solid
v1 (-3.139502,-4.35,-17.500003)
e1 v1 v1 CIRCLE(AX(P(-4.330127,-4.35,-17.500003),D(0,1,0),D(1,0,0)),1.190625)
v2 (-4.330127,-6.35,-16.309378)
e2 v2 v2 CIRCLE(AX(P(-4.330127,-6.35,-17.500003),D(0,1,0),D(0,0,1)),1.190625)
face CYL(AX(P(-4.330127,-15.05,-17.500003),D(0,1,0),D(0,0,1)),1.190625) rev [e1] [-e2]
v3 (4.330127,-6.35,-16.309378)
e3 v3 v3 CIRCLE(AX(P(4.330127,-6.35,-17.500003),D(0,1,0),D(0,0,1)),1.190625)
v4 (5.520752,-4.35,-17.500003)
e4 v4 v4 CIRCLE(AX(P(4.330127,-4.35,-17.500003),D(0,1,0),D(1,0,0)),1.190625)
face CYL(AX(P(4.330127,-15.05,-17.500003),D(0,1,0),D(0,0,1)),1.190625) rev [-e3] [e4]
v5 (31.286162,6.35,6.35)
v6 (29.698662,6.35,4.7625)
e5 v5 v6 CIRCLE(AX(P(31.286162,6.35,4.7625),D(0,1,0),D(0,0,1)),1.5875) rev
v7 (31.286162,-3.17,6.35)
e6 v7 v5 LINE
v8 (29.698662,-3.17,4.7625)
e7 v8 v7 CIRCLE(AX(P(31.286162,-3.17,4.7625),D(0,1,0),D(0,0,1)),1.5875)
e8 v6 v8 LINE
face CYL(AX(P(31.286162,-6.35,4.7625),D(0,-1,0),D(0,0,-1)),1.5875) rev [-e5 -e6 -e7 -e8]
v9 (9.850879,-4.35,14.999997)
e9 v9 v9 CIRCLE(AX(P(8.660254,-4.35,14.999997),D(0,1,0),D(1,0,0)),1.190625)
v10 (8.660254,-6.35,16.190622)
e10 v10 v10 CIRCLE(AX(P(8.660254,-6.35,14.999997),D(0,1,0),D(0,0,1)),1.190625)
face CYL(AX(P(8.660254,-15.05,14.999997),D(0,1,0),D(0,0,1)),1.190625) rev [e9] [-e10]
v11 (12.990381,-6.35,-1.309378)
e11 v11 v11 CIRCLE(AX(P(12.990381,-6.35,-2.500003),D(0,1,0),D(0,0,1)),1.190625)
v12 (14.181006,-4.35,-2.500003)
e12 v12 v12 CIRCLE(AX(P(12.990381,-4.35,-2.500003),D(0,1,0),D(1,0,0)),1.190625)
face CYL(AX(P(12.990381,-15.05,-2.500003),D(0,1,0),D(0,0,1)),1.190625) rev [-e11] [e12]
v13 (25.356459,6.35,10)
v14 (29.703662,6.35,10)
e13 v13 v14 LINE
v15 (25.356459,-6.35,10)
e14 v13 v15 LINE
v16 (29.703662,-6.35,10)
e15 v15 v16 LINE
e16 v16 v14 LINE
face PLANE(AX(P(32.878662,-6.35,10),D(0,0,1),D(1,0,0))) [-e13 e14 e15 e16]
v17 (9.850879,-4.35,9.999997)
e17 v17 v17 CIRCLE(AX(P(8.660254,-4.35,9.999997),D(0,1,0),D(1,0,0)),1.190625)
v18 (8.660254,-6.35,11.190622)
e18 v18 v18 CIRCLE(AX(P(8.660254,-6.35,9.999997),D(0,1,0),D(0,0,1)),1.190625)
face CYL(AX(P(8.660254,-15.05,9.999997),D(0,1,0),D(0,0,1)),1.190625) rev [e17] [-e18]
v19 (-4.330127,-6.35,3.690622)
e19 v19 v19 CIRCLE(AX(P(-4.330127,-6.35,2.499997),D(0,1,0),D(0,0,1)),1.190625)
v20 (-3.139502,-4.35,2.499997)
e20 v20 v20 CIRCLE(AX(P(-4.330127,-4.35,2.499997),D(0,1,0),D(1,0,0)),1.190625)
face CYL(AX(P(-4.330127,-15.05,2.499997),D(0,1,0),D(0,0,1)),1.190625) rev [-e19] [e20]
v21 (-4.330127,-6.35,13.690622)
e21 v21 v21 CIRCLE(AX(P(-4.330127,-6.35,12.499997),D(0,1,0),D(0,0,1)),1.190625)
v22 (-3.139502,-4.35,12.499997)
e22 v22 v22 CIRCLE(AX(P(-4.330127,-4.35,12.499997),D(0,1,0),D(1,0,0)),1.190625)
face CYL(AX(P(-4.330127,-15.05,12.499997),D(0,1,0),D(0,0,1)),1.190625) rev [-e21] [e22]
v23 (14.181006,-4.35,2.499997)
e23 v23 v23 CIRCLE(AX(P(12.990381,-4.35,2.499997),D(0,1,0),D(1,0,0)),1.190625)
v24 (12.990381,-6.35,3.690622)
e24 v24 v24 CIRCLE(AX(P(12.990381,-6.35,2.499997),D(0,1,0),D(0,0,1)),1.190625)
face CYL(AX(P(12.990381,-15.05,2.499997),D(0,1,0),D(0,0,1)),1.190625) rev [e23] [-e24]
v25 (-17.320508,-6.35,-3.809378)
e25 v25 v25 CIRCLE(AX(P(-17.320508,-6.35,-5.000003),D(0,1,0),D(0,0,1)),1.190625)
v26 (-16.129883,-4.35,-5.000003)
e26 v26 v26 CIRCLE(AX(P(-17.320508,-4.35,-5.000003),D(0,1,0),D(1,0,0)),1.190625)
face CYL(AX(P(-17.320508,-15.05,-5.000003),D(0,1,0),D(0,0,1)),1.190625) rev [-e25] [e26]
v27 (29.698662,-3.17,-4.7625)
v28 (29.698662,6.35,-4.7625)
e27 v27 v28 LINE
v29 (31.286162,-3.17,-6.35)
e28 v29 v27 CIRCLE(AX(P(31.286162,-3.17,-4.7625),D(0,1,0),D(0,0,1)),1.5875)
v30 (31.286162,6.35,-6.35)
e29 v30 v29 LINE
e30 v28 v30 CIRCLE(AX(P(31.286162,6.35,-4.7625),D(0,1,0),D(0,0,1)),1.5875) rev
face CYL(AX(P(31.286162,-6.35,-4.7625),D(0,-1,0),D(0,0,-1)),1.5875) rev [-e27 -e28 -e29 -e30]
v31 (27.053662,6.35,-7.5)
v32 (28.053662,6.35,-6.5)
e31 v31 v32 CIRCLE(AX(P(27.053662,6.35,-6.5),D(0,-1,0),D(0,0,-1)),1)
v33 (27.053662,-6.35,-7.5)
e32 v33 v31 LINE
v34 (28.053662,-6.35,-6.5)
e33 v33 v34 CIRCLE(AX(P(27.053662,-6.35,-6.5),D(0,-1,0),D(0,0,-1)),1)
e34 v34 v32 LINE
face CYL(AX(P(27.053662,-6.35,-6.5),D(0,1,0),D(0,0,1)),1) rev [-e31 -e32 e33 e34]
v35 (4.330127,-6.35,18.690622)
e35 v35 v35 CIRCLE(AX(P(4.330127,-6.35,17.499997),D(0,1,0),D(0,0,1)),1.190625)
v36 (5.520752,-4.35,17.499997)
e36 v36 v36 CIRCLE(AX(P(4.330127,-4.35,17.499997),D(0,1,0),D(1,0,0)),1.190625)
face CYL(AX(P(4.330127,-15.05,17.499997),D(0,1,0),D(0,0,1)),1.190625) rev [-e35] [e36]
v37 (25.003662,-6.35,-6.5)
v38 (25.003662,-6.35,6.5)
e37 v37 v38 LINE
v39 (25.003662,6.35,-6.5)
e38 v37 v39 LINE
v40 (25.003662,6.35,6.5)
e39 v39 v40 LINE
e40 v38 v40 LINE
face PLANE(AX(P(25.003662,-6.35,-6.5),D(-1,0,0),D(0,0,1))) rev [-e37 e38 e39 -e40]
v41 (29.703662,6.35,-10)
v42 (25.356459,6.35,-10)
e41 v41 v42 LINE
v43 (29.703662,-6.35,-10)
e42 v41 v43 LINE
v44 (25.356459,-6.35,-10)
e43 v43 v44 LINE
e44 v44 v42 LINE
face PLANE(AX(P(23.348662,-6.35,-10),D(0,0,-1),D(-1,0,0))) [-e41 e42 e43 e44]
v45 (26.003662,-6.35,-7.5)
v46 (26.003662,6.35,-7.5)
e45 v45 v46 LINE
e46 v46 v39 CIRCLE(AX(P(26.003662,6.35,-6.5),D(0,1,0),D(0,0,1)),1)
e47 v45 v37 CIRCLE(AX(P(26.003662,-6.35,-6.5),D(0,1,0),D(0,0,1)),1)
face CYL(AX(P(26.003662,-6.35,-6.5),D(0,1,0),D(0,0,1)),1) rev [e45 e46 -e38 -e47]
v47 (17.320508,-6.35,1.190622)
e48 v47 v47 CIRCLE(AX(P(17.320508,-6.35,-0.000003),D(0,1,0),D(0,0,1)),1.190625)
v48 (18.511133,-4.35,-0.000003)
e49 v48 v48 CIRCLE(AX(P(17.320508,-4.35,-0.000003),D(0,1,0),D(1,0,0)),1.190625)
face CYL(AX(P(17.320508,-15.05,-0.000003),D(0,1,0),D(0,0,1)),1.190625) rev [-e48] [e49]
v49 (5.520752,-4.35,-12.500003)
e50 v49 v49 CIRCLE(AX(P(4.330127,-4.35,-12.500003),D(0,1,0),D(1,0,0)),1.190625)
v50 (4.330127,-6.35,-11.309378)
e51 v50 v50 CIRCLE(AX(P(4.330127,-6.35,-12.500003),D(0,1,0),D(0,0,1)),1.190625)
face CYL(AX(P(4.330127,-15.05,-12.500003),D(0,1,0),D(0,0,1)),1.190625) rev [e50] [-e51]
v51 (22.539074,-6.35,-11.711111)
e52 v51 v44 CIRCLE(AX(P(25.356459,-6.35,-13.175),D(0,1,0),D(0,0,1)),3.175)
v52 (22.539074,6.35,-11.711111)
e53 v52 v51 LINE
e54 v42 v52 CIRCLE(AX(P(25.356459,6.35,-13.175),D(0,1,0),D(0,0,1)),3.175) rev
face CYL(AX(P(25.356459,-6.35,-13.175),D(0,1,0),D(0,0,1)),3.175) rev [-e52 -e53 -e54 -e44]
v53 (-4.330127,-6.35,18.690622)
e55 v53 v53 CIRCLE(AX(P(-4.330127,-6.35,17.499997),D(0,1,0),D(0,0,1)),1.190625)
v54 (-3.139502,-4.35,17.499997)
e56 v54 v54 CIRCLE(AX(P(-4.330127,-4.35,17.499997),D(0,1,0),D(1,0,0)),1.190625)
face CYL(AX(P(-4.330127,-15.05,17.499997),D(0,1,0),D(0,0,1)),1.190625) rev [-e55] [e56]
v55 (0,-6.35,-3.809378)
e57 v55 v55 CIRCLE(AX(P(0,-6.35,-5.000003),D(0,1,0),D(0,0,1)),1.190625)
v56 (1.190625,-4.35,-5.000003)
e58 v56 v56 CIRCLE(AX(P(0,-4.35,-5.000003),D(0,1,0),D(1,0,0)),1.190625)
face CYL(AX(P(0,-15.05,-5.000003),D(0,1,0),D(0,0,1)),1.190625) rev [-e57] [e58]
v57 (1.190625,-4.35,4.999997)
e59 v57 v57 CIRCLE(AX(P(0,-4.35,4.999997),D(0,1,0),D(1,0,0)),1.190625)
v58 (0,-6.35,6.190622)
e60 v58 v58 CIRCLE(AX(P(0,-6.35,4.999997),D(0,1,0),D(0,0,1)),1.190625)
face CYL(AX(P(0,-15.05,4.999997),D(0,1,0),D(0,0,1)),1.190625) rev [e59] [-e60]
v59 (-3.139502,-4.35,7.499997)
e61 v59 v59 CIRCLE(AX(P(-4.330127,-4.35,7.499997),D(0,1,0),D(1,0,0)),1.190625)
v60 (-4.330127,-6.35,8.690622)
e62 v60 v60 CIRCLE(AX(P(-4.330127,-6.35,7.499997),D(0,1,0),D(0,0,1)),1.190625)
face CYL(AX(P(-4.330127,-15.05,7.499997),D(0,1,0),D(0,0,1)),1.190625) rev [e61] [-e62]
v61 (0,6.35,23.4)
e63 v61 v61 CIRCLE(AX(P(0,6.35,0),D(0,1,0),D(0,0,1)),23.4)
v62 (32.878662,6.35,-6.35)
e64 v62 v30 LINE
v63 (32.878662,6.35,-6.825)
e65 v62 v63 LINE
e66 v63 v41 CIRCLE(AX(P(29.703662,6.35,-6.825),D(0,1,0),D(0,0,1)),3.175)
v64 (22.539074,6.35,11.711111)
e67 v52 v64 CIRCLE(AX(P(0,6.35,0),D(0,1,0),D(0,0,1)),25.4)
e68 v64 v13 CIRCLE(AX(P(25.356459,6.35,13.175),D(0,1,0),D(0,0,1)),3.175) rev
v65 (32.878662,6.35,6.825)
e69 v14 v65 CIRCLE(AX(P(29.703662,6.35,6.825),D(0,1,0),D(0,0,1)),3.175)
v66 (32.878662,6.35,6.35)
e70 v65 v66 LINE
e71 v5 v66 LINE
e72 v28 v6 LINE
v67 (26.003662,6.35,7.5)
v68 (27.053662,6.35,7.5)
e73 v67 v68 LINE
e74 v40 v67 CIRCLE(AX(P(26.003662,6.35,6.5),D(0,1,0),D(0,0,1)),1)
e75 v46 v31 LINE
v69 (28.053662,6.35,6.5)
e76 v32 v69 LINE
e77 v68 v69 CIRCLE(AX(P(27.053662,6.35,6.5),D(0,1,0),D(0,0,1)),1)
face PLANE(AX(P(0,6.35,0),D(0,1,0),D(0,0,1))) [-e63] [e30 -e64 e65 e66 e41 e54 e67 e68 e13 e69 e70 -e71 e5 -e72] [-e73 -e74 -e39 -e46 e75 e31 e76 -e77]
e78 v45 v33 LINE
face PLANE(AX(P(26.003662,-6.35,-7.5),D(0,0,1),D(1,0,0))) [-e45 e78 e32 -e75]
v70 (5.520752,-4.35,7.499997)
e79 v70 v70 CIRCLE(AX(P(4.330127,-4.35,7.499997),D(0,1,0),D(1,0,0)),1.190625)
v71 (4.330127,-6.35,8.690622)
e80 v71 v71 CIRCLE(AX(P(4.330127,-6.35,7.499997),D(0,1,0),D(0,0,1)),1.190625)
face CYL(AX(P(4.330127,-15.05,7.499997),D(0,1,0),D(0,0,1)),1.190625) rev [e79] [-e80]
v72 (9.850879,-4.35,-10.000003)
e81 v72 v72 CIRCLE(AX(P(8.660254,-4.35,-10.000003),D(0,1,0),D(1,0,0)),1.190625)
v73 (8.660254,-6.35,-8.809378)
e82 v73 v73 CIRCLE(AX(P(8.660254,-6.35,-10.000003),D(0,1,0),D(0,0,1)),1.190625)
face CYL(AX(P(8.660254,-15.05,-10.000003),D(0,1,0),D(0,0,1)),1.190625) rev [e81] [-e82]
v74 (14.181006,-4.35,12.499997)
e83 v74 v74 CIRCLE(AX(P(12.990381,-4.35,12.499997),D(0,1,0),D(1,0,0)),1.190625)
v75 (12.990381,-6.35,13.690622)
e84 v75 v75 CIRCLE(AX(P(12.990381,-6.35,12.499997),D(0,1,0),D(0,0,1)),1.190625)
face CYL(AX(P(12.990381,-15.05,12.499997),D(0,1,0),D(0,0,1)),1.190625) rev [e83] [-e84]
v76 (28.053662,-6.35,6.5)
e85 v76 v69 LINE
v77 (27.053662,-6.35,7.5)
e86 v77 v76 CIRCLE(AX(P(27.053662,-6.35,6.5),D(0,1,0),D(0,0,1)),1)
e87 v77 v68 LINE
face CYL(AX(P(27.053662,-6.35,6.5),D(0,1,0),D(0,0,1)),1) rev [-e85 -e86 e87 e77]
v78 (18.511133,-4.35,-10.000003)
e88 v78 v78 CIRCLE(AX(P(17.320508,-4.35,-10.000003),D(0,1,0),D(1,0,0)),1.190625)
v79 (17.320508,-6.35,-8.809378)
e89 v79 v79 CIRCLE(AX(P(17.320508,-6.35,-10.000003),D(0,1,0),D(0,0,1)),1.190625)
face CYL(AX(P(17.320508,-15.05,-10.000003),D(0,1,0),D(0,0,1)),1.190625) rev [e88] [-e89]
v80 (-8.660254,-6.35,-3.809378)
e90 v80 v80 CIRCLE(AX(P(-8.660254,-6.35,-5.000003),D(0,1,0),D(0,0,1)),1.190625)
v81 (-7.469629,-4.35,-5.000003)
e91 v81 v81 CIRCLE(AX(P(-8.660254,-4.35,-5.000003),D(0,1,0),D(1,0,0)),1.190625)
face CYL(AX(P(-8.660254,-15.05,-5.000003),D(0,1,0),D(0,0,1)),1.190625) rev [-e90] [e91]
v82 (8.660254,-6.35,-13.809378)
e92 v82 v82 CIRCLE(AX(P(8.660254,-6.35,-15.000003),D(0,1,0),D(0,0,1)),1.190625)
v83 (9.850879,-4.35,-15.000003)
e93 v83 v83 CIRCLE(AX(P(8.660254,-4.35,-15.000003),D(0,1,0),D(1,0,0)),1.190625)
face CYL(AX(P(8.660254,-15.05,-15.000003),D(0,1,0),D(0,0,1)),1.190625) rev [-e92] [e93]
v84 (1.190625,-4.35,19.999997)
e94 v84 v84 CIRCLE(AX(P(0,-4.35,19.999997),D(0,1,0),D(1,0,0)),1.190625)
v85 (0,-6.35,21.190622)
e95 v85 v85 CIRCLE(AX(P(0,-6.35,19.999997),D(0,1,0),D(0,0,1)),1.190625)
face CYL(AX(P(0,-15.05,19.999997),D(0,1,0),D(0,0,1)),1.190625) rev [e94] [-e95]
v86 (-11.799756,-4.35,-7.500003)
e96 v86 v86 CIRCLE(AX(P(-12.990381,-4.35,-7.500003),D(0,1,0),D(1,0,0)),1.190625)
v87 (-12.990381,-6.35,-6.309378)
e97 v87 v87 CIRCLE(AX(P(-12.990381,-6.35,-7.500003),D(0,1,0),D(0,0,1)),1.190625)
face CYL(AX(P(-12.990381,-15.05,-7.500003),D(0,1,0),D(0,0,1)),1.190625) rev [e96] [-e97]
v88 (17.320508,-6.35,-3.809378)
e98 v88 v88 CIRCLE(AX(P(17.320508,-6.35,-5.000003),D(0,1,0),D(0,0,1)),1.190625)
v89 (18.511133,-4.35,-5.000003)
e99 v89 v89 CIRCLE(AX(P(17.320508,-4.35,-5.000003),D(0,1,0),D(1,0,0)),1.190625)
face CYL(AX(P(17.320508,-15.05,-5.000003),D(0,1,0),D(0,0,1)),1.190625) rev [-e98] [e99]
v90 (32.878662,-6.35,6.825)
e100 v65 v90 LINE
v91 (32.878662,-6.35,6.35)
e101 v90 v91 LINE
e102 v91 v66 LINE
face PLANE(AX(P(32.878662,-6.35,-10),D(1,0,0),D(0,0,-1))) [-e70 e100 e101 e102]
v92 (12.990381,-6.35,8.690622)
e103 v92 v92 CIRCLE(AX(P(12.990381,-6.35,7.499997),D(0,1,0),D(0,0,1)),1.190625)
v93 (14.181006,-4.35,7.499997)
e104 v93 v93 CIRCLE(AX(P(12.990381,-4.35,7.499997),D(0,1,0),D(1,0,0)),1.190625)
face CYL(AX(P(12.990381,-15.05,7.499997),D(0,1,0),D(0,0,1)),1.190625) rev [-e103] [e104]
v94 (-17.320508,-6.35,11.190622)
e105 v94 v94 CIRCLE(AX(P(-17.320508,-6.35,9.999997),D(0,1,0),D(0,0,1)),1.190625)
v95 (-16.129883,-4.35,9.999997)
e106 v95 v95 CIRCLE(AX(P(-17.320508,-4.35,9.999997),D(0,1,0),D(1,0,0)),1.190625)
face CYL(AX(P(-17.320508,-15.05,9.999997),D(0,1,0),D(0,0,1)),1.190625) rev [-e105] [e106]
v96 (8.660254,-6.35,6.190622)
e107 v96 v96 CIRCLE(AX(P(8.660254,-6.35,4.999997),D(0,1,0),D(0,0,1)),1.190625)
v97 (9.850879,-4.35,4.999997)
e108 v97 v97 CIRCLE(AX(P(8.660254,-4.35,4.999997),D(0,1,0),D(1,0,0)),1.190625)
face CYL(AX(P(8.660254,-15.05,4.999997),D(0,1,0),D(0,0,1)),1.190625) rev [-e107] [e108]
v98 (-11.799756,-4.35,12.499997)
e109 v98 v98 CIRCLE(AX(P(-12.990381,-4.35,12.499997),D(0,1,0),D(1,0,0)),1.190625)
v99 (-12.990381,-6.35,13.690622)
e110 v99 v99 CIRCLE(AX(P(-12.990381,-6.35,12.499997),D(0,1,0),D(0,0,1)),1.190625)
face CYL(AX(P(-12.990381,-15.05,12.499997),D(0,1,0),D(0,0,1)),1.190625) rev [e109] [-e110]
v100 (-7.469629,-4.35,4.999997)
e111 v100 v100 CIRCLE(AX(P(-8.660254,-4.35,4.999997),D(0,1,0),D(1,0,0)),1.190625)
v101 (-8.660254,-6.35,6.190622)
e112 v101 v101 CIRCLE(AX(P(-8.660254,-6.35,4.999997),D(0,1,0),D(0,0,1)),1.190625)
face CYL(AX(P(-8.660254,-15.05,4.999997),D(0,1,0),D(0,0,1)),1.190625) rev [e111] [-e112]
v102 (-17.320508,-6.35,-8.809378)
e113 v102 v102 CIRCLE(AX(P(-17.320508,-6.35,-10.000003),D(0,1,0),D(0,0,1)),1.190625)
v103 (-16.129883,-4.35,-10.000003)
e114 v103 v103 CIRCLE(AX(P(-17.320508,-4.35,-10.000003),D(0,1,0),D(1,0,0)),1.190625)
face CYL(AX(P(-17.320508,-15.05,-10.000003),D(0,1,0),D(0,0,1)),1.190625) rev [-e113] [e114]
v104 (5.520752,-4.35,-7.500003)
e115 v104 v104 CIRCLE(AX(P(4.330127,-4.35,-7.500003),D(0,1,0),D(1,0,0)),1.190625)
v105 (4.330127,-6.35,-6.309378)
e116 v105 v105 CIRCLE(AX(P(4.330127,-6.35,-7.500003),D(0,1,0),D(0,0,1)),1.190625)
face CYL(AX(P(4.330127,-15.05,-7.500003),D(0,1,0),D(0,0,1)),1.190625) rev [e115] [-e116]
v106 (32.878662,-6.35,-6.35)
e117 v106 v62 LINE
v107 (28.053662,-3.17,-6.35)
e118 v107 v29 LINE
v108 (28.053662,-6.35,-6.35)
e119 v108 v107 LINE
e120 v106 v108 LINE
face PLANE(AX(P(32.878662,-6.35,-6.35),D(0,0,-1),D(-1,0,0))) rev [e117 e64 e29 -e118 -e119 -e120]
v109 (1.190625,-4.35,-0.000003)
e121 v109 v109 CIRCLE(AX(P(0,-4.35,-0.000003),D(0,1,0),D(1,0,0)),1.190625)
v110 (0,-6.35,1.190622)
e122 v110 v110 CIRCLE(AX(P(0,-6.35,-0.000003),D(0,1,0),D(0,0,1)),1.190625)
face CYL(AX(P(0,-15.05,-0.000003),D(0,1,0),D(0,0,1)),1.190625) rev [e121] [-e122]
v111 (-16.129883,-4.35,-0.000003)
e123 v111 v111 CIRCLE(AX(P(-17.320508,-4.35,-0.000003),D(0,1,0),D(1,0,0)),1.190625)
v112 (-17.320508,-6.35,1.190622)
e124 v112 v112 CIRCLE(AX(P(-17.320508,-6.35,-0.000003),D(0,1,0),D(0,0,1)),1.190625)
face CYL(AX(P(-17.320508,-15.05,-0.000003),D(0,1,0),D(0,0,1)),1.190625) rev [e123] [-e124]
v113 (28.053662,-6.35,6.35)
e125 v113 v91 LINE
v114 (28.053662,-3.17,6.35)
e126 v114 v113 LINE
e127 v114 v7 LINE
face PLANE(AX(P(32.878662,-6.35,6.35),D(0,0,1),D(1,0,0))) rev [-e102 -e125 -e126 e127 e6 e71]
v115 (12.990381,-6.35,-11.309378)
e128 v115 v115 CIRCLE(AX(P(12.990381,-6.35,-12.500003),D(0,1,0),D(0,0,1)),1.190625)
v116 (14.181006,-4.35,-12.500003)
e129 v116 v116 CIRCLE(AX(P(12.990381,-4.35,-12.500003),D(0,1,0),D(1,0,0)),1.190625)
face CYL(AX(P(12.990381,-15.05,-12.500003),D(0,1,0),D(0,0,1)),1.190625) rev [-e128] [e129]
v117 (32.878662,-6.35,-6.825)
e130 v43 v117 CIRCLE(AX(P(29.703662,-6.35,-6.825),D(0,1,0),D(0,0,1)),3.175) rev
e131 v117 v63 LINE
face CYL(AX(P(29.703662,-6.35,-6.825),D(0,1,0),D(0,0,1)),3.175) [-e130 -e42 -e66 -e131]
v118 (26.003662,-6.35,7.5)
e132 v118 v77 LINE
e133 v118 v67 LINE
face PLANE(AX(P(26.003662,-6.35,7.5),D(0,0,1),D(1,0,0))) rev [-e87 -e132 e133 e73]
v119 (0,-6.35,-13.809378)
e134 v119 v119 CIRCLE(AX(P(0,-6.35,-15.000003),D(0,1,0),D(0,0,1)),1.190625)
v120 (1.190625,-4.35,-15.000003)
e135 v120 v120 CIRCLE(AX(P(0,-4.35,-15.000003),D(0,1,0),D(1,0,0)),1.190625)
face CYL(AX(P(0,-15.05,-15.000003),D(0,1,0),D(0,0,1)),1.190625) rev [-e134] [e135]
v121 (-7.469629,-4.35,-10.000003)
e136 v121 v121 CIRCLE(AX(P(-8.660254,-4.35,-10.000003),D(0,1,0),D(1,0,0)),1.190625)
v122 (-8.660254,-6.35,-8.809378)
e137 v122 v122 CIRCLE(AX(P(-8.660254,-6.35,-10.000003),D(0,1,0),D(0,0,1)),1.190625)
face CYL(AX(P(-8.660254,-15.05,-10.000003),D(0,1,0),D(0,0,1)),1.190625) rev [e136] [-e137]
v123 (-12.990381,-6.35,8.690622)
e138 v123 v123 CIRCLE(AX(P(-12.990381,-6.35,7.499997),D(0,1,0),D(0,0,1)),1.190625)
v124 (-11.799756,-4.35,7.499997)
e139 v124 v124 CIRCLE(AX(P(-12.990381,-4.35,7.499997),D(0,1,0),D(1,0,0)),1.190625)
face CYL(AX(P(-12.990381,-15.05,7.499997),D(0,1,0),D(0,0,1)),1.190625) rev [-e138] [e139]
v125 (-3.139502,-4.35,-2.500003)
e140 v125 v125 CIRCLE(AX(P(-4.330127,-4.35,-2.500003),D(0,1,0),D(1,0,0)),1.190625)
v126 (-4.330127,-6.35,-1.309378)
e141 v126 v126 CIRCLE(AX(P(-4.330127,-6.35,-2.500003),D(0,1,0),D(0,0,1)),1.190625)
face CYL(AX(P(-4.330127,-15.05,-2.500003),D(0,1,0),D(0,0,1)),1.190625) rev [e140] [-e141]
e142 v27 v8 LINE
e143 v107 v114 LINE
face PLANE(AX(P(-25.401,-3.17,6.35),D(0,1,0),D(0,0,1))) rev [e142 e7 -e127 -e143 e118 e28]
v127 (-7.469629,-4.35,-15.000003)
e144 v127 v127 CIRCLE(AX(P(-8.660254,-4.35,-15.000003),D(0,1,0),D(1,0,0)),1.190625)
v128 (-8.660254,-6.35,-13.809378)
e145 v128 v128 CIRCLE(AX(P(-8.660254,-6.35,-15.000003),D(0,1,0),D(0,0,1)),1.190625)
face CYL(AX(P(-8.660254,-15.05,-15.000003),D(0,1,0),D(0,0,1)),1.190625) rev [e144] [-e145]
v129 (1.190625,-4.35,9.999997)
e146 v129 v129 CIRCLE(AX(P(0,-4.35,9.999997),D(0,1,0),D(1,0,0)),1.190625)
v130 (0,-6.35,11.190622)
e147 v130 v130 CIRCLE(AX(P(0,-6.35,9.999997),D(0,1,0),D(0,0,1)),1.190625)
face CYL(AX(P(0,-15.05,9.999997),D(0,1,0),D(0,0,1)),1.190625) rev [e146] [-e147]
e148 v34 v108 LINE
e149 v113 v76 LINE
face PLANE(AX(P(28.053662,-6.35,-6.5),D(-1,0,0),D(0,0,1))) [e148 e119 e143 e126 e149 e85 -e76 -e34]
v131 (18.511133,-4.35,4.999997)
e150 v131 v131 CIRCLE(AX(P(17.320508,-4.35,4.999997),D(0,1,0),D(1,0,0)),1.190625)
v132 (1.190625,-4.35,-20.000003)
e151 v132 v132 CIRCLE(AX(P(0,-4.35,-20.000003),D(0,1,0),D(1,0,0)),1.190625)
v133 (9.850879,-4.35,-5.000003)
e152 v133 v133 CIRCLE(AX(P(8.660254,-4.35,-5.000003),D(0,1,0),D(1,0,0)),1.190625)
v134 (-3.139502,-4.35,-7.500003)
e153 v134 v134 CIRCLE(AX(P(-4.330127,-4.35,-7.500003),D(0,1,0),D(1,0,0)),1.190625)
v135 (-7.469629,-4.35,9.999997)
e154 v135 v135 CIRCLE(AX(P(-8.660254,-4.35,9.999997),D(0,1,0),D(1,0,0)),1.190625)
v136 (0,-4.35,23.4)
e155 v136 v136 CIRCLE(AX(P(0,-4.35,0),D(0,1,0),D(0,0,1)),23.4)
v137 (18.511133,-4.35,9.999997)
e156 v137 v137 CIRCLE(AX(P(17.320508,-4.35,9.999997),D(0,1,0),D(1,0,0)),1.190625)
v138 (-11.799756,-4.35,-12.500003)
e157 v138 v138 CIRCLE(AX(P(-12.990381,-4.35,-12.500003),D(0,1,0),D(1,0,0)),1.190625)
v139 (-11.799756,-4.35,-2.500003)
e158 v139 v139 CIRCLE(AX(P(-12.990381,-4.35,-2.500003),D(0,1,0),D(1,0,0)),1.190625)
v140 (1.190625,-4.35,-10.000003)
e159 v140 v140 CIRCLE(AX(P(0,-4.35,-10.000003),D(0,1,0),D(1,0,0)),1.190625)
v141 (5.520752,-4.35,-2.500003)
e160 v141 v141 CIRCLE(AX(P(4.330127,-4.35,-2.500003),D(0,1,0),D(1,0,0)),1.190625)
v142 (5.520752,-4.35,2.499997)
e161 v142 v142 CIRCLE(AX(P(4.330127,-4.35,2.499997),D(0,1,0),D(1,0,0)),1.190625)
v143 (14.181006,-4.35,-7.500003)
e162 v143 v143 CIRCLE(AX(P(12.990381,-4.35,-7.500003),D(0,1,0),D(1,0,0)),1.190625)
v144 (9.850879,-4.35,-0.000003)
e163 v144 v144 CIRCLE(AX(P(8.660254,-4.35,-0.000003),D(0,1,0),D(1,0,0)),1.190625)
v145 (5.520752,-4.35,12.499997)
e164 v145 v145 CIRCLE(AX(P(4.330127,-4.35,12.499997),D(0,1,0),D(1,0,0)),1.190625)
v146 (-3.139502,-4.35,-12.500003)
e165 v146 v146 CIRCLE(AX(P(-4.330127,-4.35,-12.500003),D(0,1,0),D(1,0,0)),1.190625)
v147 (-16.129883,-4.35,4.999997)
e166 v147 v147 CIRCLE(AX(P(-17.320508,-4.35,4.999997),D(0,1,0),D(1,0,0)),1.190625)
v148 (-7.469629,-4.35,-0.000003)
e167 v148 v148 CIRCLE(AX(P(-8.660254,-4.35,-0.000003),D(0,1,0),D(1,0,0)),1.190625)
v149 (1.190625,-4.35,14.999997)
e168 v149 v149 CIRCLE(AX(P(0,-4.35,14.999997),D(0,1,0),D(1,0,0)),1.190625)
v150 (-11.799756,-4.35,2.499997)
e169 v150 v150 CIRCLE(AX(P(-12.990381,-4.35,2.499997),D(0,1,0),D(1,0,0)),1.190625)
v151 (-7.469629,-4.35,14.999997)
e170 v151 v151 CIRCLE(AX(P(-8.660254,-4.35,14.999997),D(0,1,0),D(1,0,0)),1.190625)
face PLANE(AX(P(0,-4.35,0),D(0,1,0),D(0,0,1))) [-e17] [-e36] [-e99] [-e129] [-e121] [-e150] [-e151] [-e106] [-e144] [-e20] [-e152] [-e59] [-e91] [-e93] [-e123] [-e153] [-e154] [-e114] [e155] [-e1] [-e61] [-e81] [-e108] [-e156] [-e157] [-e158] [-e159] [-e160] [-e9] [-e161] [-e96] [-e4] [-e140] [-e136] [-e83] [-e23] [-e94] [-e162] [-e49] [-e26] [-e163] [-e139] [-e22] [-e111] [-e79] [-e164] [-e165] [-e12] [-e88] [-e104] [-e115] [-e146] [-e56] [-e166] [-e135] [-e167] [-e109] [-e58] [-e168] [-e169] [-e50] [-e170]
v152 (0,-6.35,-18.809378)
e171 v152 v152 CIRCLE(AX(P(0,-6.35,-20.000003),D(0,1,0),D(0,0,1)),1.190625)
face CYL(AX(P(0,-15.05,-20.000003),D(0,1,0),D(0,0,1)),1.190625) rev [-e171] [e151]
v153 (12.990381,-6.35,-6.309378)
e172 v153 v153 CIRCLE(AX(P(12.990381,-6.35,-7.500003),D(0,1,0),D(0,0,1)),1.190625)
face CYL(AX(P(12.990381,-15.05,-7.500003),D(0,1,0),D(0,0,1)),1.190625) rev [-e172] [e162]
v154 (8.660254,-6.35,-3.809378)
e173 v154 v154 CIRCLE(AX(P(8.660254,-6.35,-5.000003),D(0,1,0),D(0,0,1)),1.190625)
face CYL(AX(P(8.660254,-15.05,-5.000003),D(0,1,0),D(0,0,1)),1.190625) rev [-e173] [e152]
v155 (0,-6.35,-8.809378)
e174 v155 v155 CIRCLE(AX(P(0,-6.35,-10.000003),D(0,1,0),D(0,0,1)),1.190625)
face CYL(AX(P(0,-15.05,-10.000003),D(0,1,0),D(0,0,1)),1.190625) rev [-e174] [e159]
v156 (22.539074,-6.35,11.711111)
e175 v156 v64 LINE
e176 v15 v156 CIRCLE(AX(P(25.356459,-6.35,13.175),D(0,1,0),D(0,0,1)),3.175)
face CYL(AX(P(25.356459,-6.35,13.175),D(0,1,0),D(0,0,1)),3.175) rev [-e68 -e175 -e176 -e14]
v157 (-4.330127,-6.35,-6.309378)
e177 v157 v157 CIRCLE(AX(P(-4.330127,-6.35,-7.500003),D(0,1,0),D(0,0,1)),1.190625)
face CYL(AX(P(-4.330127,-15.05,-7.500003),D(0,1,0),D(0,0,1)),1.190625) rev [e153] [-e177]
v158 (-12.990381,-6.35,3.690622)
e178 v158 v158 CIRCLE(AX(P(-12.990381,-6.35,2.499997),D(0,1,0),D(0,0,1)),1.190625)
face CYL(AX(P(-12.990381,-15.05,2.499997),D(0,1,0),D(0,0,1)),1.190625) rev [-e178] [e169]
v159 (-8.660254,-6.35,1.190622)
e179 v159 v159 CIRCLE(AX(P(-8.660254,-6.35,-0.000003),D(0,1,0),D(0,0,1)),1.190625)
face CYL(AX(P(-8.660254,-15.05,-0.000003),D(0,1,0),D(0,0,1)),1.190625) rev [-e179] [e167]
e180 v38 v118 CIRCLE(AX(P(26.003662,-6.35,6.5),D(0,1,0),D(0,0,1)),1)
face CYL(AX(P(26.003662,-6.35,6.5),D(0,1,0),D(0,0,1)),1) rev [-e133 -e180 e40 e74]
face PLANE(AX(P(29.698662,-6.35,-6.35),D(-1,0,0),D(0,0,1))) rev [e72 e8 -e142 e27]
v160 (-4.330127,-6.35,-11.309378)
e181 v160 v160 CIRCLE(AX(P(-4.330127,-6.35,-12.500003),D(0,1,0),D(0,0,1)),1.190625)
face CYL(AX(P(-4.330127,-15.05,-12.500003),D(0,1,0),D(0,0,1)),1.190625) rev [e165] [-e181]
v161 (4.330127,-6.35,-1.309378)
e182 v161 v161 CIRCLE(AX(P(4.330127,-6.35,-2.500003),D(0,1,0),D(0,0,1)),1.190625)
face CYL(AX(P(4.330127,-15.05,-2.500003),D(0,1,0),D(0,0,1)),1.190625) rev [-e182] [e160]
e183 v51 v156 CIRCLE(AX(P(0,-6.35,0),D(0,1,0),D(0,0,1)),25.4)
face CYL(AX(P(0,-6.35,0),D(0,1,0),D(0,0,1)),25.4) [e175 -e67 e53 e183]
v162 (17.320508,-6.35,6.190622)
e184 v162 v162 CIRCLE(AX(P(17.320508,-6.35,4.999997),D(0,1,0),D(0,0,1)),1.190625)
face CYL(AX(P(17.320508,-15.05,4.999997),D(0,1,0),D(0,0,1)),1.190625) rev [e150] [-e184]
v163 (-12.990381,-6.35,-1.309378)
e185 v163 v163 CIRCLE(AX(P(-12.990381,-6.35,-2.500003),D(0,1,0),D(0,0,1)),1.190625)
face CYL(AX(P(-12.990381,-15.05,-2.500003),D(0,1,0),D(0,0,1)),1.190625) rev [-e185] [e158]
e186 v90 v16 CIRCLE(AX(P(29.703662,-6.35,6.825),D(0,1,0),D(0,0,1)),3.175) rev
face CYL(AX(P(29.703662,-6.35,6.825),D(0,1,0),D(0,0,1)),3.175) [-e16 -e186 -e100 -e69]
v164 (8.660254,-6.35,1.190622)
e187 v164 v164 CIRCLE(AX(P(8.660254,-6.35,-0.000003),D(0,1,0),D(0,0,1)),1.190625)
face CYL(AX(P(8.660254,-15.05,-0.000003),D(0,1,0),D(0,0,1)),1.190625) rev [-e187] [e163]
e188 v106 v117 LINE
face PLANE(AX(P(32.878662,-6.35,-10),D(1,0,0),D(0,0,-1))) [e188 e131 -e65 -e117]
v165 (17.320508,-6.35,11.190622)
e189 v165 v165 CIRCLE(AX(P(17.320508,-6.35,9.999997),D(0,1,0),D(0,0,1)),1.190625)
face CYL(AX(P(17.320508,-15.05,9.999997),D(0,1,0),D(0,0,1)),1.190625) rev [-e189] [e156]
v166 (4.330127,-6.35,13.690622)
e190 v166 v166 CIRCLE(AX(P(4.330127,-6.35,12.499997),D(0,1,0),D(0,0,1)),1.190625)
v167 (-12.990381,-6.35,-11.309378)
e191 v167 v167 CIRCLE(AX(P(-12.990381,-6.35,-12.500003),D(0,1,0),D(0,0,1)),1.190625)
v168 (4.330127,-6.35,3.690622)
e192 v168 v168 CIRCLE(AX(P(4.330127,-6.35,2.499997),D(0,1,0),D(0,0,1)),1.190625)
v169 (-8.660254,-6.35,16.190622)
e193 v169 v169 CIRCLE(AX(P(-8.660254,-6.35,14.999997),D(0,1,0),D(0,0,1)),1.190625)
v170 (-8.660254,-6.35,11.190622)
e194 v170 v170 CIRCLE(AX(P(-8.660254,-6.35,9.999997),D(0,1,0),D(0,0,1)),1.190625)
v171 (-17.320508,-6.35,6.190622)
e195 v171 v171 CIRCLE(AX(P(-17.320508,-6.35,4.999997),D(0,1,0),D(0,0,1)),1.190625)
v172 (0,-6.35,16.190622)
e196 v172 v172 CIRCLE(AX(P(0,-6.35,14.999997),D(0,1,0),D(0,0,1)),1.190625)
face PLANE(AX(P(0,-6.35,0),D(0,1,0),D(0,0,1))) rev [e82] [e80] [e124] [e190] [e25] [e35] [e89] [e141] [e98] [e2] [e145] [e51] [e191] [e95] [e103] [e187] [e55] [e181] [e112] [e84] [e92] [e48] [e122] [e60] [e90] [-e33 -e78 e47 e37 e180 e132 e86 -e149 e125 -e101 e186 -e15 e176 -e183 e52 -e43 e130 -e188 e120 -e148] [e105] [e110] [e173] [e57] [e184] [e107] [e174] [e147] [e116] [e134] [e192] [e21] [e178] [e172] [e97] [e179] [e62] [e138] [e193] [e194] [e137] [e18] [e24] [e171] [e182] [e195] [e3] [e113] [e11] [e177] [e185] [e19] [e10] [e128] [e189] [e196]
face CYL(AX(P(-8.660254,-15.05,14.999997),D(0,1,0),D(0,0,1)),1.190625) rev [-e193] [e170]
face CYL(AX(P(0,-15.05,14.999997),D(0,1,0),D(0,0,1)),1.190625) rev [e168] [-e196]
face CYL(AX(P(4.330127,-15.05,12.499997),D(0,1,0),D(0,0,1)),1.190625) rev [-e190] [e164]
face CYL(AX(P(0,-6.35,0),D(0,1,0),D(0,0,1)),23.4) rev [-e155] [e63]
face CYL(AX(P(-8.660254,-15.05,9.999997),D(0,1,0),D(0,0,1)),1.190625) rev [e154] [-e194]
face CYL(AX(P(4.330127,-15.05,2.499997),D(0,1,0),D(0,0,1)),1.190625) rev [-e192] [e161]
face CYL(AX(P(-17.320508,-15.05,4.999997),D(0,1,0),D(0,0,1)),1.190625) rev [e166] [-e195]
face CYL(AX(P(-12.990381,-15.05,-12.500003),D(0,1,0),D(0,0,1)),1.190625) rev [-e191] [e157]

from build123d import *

# Parameters (mm, degrees)
BOSS_EXTRUDE1_DEPTH      = 6.35
BOSS_EXTRUDE1_DEPTH_BACK = 6.35
SKETCH2_R                = 25.4
SHELL1_T                 = -2
BOSS_EXTRUDE2_DEPTH      = 6.35
BOSS_EXTRUDE2_DEPTH_BACK = 6.35
CUT_EXTRUDE1_DEPTH       = 44.444866103
SKETCH10_W               = 3.18
SKETCH10_H               = 12.7
CUT_EXTRUDE2_DEPTH       = 44.444866103
FILLET1_R                = 3.175
CUT_EXTRUDE4_REACH       = 63.003
SKETCH11_W               = 12.7
SKETCH11_H               = 3.18
FILLET2_R                = 1.5875
FILL_START               = -6.35
FILL_PATTERN1_OUTLINE_R  = 1.190625
FILL_PATTERN1_DEPTH      = 2


# Read off the part's stored shape, not the designer's step: Fill Pattern1
with BuildPart() as part:
    # Sketch2 → Boss-Extrude1 (new, two sides: drawn at the far end of the back side and taken through both)
    with BuildSketch(Plane(origin=(0, 0, 0), x_dir=(1, 0, 0), z_dir=(0, 1, 0)).offset(-BOSS_EXTRUDE1_DEPTH_BACK)):
        with Locations(Location((0, 0, 0), (0, 0, 270))):
            Circle(SKETCH2_R)
    extrude(amount=BOSS_EXTRUDE1_DEPTH + BOSS_EXTRUDE1_DEPTH_BACK)

    # Shell1
    shell1_openings = [part.faces().sort_by_distance(p)[0] for p in [
        (0, 6.35, 0),
    ]]
    offset(amount=SHELL1_T, openings=shell1_openings, kind=Kind.INTERSECTION)

    # Sketch7 → Boss-Extrude2 (add, two sides: drawn at the far end of the back side and taken through both)
    with BuildSketch(Plane(origin=(0, 0, 0), x_dir=(1, 0, 0), z_dir=(0, 1, 0)).offset(-BOSS_EXTRUDE2_DEPTH_BACK)):
        with BuildLine():
            Line((23.348661632, 10), (32.878661632, 10))
            Line((32.878661632, 10), (32.878661632, -10))
            Line((32.878661632, -10), (23.348661632, -10))
            ThreePointArc((23.348661632, -10), (25.4, 0), (23.348661632, 10))
        make_face()
    extrude(amount=BOSS_EXTRUDE2_DEPTH + BOSS_EXTRUDE2_DEPTH_BACK)

    # Sketch9 → Cut-Extrude1 (cut, through all)
    with BuildSketch(Plane(origin=(0, 6.35, 0), x_dir=(1, 0, 0), z_dir=(0, 1, 0))):
        with BuildLine():
            Line((26.003661632, 7.5), (27.053661632, 7.5))
            ThreePointArc((27.053661632, 7.5), (27.760768413, 7.207106781), (28.053661632, 6.5))
            Line((28.053661632, 6.5), (28.053661632, -6.5))
            ThreePointArc((28.053661632, -6.5), (27.760768413, -7.207106781), (27.053661632, -7.5))
            Line((27.053661632, -7.5), (26.003661632, -7.5))
            ThreePointArc((26.003661632, -7.5), (25.296554851, -7.207106781), (25.003661632, -6.5))
            Line((25.003661632, -6.5), (25.003661632, 6.5))
            ThreePointArc((25.003661632, 6.5), (25.296554851, 7.207106781), (26.003661632, 7.5))
        make_face()
    extrude(amount=-CUT_EXTRUDE1_DEPTH, mode=Mode.SUBTRACT)

    # Sketch10 → Cut-Extrude2 (cut, through all)
    with BuildSketch(Plane(origin=(0, 6.35, 0), x_dir=(1, 0, 0), z_dir=(0, 1, 0))):
        with Locations((31.288661632, 0)):
            Rectangle(SKETCH10_W, SKETCH10_H)
    extrude(amount=-CUT_EXTRUDE2_DEPTH, mode=Mode.SUBTRACT)

    # Fillet1
    fillet1_edges = [part.edges().sort_by_distance(p)[0] for p in [
        (23.348661632, 0, 10),
        (23.348661632, 0, -10),
        (32.878661632, 0, -10),
        (32.878661632, 0, 10),
    ]]
    fillet(fillet1_edges, radius=FILLET1_R)

    # Sketch11 → Cut-Extrude4 (cut, up to next)
    with BuildSketch(Plane(origin=(29.698661632, 0, 0), x_dir=(0, 0, -1), z_dir=(1, 0, 0)), mode=Mode.PRIVATE) as cut_extrude4_sk1:
        with Locations((0, -4.76)):
            Rectangle(SKETCH11_W, SKETCH11_H)
    cut_extrude4_tool1 = extrude(cut_extrude4_sk1.sketch, amount=-CUT_EXTRUDE4_REACH, mode=Mode.PRIVATE) & part.part
    add(cut_extrude4_tool1.solids().sort_by_distance((29.698662, -4.76, 0))[0], mode=Mode.SUBTRACT)

    # Fillet2
    fillet2_edges = [part.edges().sort_by_distance(p)[0] for p in [
        (29.698661632, 1.59, -6.35),
        (29.698661632, 1.59, 6.35),
    ]]
    fillet(fillet2_edges, radius=FILLET2_R)

    # Fill Pattern1 outline → Fill Pattern1 (cut)
    with BuildSketch(Plane(origin=(0, 0, 0), x_dir=(1, 0, 0), z_dir=(0, 1, 0)).offset(FILL_START)):
        with Locations((0, -19.999996628)):
            Circle(FILL_PATTERN1_OUTLINE_R)
        with Locations((4.330127019, -12.499996628)):
            Circle(FILL_PATTERN1_OUTLINE_R)
        with Locations((4.330127019, -7.499996628)):
            Circle(FILL_PATTERN1_OUTLINE_R)
        with Locations((8.660254038, -4.999996628)):
            Circle(FILL_PATTERN1_OUTLINE_R)
        with Locations((8.660254038, 3.372e-06)):
            Circle(FILL_PATTERN1_OUTLINE_R)
        with Locations((12.990381057, 2.500003372)):
            Circle(FILL_PATTERN1_OUTLINE_R)
        with Locations((12.990381057, 7.500003372)):
            Circle(FILL_PATTERN1_OUTLINE_R)
        with Locations((8.660254038, 15.000003372)):
            Circle(FILL_PATTERN1_OUTLINE_R)
        with Locations((-12.990381057, -12.499996628)):
            Circle(FILL_PATTERN1_OUTLINE_R)
        with Locations((-4.330127019, -12.499996628)):
            Circle(FILL_PATTERN1_OUTLINE_R)
        with Locations((0, -9.999996628)):
            Circle(FILL_PATTERN1_OUTLINE_R)
        with Locations((0, -4.999996628)):
            Circle(FILL_PATTERN1_OUTLINE_R)
        with Locations((4.330127019, -2.499996628)):
            Circle(FILL_PATTERN1_OUTLINE_R)
        with Locations((4.330127019, 2.500003372)):
            Circle(FILL_PATTERN1_OUTLINE_R)
        with Locations((8.660254038, 5.000003372)):
            Circle(FILL_PATTERN1_OUTLINE_R)
        with Locations((8.660254038, 10.000003372)):
            Circle(FILL_PATTERN1_OUTLINE_R)
        with Locations((17.320508076, 10.000003372)):
            Circle(FILL_PATTERN1_OUTLINE_R)
        with Locations((-4.330127019, -17.499996628)):
            Circle(FILL_PATTERN1_OUTLINE_R)
        with Locations((4.330127019, -17.499996628)):
            Circle(FILL_PATTERN1_OUTLINE_R)
        with Locations((8.660254038, -14.999996628)):
            Circle(FILL_PATTERN1_OUTLINE_R)
        with Locations((17.320508076, -4.999996628)):
            Circle(FILL_PATTERN1_OUTLINE_R)
        with Locations((17.320508076, -9.999996628)):
            Circle(FILL_PATTERN1_OUTLINE_R)
        with Locations((12.990381057, -12.499996628)):
            Circle(FILL_PATTERN1_OUTLINE_R)
        with Locations((0, -14.999996628)):
            Circle(FILL_PATTERN1_OUTLINE_R)
        with Locations((-8.660254038, -14.999996628)):
            Circle(FILL_PATTERN1_OUTLINE_R)
        with Locations((12.990381057, 12.500003372)):
            Circle(FILL_PATTERN1_OUTLINE_R)
        with Locations((17.320508076, 5.000003372)):
            Circle(FILL_PATTERN1_OUTLINE_R)
        with Locations((17.320508076, 3.372e-06)):
            Circle(FILL_PATTERN1_OUTLINE_R)
        with Locations((12.990381057, -2.499996628)):
            Circle(FILL_PATTERN1_OUTLINE_R)
        with Locations((12.990381057, -7.499996628)):
            Circle(FILL_PATTERN1_OUTLINE_R)
        with Locations((8.660254038, -9.999996628)):
            Circle(FILL_PATTERN1_OUTLINE_R)
        with Locations((-8.660254038, 10.000003372)):
            Circle(FILL_PATTERN1_OUTLINE_R)
        with Locations((-8.660254038, 5.000003372)):
            Circle(FILL_PATTERN1_OUTLINE_R)
        with Locations((-12.990381057, 2.500003372)):
            Circle(FILL_PATTERN1_OUTLINE_R)
        with Locations((-12.990381057, -2.499996628)):
            Circle(FILL_PATTERN1_OUTLINE_R)
        with Locations((0, 10.000003372)):
            Circle(FILL_PATTERN1_OUTLINE_R)
        with Locations((0, 15.000003372)):
            Circle(FILL_PATTERN1_OUTLINE_R)
        with Locations((-17.320508076, -4.999996628)):
            Circle(FILL_PATTERN1_OUTLINE_R)
        with Locations((-12.990381057, 7.500003372)):
            Circle(FILL_PATTERN1_OUTLINE_R)
        with Locations((-12.990381057, 12.500003372)):
            Circle(FILL_PATTERN1_OUTLINE_R)
        with Locations((-8.660254038, 15.000003372)):
            Circle(FILL_PATTERN1_OUTLINE_R)
        with Locations((-17.320508076, 10.000003372)):
            Circle(FILL_PATTERN1_OUTLINE_R)
        with Locations((-17.320508076, 5.000003372)):
            Circle(FILL_PATTERN1_OUTLINE_R)
        with Locations((-17.320508076, 3.372e-06)):
            Circle(FILL_PATTERN1_OUTLINE_R)
        with Locations((-4.330127019, 17.500003372)):
            Circle(FILL_PATTERN1_OUTLINE_R)
        with Locations((-4.330127019, 12.500003372)):
            Circle(FILL_PATTERN1_OUTLINE_R)
        with Locations((0, 5.000003372)):
            Circle(FILL_PATTERN1_OUTLINE_R)
        with Locations((0, 3.372e-06)):
            Circle(FILL_PATTERN1_OUTLINE_R)
        with Locations((-4.330127019, -2.499996628)):
            Circle(FILL_PATTERN1_OUTLINE_R)
        with Locations((-4.330127019, -7.499996628)):
            Circle(FILL_PATTERN1_OUTLINE_R)
        with Locations((-8.660254038, -9.999996628)):
            Circle(FILL_PATTERN1_OUTLINE_R)
        with Locations((-17.320508076, -9.999996628)):
            Circle(FILL_PATTERN1_OUTLINE_R)
        with Locations((4.330127019, 17.500003372)):
            Circle(FILL_PATTERN1_OUTLINE_R)
        with Locations((-4.330127019, 7.500003372)):
            Circle(FILL_PATTERN1_OUTLINE_R)
        with Locations((-4.330127019, 2.500003372)):
            Circle(FILL_PATTERN1_OUTLINE_R)
        with Locations((-8.660254038, 3.372e-06)):
            Circle(FILL_PATTERN1_OUTLINE_R)
        with Locations((-8.660254038, -4.999996628)):
            Circle(FILL_PATTERN1_OUTLINE_R)
        with Locations((-12.990381057, -7.499996628)):
            Circle(FILL_PATTERN1_OUTLINE_R)
        with Locations((0, 20.000003372)):
            Circle(FILL_PATTERN1_OUTLINE_R)
        with Locations((4.330127019, 12.500003372)):
            Circle(FILL_PATTERN1_OUTLINE_R)
        with Locations((4.330127019, 7.500003372)):
            Circle(FILL_PATTERN1_OUTLINE_R)
    extrude(amount=FILL_PATTERN1_DEPTH, mode=Mode.SUBTRACT)


solid = part.part
